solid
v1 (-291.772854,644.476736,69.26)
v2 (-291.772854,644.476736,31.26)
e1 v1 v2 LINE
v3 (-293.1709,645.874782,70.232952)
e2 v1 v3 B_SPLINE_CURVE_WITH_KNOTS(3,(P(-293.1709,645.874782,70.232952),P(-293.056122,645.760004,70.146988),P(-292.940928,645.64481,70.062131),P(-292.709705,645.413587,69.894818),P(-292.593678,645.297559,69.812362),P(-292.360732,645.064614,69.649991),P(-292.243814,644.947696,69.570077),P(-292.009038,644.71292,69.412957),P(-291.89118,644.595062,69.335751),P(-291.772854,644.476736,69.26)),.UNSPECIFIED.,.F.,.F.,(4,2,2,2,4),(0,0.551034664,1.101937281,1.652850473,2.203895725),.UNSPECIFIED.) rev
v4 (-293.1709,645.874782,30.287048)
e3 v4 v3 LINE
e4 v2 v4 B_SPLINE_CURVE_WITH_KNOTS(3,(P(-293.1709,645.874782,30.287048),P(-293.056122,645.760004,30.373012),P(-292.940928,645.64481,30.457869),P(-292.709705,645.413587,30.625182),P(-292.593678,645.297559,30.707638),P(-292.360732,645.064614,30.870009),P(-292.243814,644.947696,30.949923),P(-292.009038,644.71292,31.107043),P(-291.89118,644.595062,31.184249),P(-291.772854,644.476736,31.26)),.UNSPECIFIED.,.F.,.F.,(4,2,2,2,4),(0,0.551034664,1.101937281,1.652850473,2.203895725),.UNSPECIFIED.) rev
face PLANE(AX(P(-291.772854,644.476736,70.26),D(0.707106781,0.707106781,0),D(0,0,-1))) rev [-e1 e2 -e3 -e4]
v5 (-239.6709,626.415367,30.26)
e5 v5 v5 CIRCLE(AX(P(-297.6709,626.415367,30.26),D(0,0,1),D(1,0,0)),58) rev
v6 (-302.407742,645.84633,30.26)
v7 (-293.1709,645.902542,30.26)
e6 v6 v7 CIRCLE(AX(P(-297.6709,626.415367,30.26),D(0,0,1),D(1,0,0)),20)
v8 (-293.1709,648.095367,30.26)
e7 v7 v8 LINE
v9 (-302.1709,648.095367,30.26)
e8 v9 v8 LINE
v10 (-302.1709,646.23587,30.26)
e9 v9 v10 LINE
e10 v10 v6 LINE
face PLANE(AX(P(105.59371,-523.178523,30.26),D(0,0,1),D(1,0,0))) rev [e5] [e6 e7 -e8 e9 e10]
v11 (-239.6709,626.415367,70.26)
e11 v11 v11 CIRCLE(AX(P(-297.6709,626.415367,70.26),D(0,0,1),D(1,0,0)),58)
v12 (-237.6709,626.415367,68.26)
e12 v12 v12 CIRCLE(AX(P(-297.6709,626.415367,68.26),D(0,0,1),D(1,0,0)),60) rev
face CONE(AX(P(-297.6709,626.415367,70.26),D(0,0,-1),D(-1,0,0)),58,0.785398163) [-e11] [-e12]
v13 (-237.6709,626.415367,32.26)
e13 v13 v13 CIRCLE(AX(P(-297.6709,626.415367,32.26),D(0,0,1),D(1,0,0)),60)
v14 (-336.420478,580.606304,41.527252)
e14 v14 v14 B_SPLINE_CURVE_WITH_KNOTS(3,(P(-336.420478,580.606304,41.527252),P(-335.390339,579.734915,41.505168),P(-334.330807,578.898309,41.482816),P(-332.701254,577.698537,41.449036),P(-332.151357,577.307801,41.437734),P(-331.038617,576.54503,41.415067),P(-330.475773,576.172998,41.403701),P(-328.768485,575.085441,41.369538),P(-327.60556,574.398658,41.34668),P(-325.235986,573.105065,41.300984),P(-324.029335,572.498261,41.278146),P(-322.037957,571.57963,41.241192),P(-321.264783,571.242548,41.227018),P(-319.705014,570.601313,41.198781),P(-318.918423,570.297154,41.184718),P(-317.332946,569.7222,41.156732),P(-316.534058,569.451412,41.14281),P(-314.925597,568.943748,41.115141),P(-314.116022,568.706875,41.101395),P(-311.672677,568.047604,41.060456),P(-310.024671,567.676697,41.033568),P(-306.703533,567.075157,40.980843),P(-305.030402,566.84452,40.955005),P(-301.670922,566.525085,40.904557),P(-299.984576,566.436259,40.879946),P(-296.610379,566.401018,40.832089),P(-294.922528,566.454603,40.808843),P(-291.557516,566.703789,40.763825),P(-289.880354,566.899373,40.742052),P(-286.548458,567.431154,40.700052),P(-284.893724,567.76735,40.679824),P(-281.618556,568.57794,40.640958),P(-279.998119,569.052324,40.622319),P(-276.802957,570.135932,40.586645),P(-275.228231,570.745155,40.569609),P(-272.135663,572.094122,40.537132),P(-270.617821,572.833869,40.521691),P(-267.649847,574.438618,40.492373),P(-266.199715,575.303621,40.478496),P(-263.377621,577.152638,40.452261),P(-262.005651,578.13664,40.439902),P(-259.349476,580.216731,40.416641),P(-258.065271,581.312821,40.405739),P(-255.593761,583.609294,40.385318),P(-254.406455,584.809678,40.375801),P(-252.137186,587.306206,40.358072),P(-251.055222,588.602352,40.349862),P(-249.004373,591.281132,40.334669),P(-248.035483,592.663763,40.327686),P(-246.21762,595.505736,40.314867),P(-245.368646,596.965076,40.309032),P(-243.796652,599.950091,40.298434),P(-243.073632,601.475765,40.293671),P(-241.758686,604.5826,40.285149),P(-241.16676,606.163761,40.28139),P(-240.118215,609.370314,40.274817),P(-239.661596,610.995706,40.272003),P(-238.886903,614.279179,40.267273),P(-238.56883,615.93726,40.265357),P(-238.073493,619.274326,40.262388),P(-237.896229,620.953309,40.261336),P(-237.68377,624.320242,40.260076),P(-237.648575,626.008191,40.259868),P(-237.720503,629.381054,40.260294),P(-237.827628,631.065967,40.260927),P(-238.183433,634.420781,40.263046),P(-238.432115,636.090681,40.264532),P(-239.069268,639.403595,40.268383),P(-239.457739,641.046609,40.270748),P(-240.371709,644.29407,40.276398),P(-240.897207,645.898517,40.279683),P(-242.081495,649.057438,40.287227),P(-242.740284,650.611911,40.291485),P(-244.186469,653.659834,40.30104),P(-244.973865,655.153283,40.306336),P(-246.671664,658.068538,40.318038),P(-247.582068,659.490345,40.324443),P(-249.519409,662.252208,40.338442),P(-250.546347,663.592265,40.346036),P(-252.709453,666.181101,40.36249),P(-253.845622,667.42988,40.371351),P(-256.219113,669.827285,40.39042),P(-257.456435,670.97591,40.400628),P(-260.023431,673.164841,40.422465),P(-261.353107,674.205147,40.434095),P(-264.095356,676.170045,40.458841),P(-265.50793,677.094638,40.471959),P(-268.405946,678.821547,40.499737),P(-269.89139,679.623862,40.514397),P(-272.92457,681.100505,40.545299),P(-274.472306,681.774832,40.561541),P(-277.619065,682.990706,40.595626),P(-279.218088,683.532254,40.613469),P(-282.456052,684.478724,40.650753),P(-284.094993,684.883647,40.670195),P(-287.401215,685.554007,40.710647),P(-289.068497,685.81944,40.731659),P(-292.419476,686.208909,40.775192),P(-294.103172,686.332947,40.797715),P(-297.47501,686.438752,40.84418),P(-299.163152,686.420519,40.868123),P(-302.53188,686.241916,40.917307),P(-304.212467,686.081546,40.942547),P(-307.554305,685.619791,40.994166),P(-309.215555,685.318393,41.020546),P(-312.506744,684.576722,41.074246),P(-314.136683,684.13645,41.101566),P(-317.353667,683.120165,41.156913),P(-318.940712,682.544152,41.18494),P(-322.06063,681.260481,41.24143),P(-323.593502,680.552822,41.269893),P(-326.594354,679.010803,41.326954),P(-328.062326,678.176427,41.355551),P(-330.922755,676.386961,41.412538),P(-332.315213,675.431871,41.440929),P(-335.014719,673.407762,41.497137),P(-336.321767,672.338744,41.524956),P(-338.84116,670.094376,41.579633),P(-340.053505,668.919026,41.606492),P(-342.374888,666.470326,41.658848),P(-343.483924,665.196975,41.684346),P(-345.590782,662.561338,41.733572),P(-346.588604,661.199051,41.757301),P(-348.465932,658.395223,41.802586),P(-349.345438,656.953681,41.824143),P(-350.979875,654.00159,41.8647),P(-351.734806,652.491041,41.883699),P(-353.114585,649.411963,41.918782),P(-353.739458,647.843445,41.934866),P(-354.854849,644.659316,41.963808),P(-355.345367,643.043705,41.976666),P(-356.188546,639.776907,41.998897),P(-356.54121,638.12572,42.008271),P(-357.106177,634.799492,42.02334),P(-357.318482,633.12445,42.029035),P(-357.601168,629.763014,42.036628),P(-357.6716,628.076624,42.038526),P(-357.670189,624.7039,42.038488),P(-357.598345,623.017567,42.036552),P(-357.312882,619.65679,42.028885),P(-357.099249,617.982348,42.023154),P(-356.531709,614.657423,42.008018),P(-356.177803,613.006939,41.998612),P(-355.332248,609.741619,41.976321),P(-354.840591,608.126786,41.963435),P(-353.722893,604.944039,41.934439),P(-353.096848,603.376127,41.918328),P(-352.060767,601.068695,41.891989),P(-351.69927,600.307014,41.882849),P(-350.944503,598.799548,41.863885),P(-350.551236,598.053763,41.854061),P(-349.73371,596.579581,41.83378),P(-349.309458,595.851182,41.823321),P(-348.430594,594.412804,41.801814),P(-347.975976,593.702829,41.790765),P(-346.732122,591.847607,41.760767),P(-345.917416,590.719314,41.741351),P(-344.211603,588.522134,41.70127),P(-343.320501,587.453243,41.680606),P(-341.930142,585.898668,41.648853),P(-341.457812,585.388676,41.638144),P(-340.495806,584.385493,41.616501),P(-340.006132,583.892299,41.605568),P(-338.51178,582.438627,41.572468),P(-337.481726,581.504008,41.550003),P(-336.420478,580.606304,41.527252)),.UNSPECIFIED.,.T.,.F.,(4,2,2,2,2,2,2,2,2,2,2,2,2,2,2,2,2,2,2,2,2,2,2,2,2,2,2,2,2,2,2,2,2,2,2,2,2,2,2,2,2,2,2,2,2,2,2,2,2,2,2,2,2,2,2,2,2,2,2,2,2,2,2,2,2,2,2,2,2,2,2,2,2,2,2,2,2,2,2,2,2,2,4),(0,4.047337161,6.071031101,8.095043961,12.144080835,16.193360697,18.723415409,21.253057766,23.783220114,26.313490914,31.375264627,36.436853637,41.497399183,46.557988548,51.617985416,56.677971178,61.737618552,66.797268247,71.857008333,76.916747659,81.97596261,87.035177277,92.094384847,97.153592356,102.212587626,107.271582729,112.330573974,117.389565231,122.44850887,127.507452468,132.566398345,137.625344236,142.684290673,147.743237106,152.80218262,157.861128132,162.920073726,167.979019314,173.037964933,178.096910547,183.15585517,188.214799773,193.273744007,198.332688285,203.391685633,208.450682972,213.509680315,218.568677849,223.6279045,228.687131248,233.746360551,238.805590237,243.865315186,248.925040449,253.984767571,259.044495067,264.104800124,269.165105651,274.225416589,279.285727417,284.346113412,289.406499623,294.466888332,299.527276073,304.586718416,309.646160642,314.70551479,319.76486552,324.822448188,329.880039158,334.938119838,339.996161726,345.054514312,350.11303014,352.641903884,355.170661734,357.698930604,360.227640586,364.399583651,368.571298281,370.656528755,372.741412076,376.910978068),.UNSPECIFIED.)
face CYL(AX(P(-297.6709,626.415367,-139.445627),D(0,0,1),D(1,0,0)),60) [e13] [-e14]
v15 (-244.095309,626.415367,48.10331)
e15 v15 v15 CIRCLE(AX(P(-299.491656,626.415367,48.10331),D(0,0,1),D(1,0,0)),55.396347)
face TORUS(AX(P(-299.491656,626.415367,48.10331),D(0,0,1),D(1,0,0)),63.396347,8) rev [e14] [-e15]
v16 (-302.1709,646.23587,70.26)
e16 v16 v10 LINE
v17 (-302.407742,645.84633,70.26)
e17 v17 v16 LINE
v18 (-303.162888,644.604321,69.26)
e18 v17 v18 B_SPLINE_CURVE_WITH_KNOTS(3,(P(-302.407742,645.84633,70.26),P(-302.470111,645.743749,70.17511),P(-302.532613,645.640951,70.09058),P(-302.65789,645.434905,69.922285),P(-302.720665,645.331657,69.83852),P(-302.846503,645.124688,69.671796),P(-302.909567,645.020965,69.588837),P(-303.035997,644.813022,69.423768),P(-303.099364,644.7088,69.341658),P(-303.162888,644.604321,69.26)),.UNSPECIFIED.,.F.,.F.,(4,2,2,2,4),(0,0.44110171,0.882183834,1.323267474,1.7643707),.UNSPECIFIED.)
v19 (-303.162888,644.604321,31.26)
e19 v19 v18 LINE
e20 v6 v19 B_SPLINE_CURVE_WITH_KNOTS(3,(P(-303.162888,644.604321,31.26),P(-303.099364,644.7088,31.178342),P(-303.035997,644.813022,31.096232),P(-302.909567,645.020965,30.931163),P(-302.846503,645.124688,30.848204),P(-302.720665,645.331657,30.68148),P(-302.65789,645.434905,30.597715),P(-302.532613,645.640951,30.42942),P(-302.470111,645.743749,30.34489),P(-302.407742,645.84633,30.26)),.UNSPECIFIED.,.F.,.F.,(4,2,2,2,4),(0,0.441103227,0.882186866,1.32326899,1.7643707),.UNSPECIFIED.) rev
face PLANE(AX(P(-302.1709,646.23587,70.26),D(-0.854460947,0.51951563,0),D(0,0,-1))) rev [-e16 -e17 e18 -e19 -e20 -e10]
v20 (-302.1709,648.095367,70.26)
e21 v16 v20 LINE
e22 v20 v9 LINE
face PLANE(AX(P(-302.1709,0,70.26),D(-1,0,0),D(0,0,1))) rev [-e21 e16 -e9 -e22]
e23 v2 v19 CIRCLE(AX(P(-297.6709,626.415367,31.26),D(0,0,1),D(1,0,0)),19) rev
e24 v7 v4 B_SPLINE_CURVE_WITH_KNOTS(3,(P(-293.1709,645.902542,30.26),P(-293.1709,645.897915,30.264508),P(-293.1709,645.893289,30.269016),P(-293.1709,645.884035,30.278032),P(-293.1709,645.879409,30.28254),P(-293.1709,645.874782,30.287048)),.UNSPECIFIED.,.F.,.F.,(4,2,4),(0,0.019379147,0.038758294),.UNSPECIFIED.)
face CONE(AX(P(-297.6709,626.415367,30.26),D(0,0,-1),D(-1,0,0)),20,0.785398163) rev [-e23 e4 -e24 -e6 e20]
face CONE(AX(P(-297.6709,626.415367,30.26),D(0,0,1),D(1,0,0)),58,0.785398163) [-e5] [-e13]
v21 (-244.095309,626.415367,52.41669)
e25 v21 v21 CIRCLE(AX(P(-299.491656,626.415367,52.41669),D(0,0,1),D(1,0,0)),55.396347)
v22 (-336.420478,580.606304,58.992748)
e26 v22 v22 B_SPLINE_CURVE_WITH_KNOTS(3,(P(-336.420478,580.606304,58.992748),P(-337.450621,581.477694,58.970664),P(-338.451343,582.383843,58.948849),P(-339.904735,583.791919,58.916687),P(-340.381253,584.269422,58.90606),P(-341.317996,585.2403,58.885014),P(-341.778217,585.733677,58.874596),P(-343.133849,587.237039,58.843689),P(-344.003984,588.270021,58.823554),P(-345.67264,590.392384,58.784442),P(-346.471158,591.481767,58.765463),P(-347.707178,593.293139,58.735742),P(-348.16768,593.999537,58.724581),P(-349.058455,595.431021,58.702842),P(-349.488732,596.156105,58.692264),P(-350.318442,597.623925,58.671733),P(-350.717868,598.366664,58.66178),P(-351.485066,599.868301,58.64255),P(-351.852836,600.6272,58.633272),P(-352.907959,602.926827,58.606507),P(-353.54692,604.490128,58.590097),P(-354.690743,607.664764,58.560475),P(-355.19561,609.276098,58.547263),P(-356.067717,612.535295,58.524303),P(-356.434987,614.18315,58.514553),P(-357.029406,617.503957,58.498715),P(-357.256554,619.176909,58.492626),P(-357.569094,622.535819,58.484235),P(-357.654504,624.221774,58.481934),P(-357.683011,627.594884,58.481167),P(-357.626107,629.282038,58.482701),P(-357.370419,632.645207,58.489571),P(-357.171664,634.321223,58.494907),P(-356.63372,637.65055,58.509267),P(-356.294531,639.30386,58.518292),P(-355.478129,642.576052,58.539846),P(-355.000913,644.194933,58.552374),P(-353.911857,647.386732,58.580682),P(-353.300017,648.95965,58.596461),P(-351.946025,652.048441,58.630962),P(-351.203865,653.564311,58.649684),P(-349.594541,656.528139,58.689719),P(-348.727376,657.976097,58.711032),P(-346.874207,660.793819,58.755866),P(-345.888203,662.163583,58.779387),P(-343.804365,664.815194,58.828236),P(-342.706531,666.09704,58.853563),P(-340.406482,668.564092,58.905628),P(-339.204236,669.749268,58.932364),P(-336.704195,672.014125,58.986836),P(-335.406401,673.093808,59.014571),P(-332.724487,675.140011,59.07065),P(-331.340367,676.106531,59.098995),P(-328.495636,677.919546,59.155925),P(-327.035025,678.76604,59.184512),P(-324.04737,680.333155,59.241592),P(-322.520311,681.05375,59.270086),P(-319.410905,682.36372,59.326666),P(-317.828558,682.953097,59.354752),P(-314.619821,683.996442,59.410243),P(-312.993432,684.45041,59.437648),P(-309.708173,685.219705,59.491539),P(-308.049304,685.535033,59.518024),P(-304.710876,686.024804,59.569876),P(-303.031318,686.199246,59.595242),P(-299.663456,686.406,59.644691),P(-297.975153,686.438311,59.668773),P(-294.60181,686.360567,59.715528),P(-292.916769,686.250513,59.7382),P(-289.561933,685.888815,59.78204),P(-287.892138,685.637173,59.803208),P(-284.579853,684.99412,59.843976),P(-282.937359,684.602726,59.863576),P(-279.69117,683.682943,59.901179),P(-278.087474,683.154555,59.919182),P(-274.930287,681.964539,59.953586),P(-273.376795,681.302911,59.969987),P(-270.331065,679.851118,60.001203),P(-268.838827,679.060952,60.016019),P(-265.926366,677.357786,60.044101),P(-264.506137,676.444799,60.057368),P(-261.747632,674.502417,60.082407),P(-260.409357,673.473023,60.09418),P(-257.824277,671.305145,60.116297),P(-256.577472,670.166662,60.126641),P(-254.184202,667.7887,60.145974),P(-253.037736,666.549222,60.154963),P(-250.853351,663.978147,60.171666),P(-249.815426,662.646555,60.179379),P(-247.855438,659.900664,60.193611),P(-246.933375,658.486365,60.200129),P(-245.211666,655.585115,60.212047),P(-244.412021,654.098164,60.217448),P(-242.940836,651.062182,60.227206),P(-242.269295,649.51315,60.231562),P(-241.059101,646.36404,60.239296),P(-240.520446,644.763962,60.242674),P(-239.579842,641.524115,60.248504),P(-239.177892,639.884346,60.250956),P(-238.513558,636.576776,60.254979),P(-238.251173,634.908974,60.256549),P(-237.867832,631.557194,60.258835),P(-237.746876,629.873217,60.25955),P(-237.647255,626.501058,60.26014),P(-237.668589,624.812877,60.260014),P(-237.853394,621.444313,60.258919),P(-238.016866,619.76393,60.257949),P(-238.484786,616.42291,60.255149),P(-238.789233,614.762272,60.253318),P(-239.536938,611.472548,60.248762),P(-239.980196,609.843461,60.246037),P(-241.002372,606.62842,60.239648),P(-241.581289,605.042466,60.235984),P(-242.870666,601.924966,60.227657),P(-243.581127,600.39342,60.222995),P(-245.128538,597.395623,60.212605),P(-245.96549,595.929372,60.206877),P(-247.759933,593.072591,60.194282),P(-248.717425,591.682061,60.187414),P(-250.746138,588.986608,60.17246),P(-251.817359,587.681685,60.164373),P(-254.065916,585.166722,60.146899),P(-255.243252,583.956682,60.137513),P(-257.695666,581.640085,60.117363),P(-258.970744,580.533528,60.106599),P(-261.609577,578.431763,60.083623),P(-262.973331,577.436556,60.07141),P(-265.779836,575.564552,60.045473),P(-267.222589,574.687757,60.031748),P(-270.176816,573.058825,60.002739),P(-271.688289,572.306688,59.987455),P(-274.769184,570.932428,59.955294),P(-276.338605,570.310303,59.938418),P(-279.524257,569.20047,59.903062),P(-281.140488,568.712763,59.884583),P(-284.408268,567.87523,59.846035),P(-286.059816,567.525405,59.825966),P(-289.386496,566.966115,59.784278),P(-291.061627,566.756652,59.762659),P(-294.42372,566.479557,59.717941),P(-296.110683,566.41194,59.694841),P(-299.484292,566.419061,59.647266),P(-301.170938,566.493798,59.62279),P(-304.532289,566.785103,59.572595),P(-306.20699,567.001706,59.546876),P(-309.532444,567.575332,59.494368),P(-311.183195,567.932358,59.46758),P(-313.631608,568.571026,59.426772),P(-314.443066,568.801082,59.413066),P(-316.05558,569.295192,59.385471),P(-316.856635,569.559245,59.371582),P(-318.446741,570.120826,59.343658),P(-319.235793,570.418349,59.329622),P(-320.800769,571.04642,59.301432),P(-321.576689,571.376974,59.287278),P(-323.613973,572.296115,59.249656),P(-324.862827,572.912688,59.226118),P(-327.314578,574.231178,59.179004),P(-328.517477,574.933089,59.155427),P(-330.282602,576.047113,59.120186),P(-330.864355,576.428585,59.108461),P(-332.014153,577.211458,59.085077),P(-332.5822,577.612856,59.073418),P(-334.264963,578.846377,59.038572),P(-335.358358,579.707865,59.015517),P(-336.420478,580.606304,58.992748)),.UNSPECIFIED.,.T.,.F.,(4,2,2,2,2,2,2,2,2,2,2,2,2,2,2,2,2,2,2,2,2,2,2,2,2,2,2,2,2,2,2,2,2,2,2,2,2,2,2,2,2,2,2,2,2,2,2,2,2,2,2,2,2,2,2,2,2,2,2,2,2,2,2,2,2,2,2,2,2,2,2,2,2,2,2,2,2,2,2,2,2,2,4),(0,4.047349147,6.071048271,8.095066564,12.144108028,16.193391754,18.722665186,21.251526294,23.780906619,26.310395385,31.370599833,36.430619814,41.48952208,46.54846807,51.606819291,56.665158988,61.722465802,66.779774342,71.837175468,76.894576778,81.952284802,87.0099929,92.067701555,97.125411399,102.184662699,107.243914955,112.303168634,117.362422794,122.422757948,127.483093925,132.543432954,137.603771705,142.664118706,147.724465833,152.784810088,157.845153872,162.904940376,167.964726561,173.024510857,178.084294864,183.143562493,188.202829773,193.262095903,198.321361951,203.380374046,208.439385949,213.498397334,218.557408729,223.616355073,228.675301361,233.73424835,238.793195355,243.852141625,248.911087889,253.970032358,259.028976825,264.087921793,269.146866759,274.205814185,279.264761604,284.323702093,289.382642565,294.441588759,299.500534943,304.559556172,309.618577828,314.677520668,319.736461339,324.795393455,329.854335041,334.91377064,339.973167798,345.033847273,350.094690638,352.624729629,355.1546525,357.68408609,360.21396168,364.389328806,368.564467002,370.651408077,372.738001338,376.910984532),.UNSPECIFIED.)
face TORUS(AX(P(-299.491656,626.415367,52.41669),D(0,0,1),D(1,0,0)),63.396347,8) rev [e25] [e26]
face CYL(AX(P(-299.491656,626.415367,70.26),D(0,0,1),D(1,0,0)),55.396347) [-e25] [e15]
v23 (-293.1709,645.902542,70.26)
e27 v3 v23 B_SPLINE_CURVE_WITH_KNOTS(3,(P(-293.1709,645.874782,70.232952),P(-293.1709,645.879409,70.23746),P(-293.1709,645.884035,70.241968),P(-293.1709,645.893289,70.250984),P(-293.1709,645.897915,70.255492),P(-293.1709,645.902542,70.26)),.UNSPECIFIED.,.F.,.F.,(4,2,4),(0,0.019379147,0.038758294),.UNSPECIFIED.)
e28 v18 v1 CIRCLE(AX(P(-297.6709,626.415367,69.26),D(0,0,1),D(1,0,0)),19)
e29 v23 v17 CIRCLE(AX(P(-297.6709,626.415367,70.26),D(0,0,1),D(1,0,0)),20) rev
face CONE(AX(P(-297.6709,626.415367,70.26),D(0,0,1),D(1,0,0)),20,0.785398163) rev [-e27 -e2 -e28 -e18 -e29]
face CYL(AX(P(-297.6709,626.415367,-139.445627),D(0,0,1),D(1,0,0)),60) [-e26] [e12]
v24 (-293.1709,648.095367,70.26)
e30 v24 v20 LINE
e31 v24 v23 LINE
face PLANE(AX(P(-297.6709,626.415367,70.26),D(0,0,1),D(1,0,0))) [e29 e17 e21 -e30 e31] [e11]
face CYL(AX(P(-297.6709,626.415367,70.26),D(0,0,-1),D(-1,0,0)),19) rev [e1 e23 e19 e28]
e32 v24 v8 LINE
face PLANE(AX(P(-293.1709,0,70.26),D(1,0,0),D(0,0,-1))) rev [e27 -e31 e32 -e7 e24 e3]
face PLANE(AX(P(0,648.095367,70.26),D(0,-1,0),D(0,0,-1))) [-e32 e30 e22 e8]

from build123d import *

# Parameters (mm, degrees)
SKETCH_1_R               = 60
SKETCH_1_R_2             = 14.438127561
EXTRUDE_1_DEPTH          = 40
CHAMFER_1_SIZE           = 2
SKETCH_5_R               = 25.161734689
EXTRUDE_2_DEPTH          = 40
CUT_EXTRUDE_1_DEPTH      = 776.044855896
CUT_EXTRUDE_1_DEPTH_BACK = 776.044855896
CHAMFER_2_SIZE           = 1.361088561
CHAMFER_2_SIZE_2         = 1


with BuildPart() as part:
    # 草图1 → 凸台-拉伸1 (new body)
    with BuildSketch(Plane.XY.offset(70.26)):
        with Locations((-297.670899951, 626.415366791)):
            Circle(SKETCH_1_R)
        with Locations((-297.670899951, 626.415366791)):
            Circle(SKETCH_1_R_2, mode=Mode.SUBTRACT)
    extrude(amount=-EXTRUDE_1_DEPTH)

    # 草图4 → 切除-旋转1 (revolve, cut)
    with BuildSketch(Plane(origin=(0, 626.415366791, 0), x_dir=(1, 0, 0), z_dir=(0, 1, 0))):
        with BuildLine():
            Line((-244.095308656, -48.103310059), (-244.095308655, -52.416689982))
            ThreePointArc((-244.095308655, -52.416689982), (-242.284199059, -57.48597347), (-237.670899813, -60.259999987))
            Line((-237.670899813, -60.259999987), (-237.670899811, -40.260000013))
            ThreePointArc((-237.670899811, -40.260000013), (-242.284199071, -43.034026546), (-244.095308656, -48.103310059))
        make_face()
    revolve(axis=Axis((-299.491656028, 626.415366791, 70.26), (0, 0, -1)), mode=Mode.SUBTRACT)

    # 倒角1
    chamfer_1_edges = [part.edges().sort_by_distance(p)[0] for p in [
        (-357.670899951, 626.415366791, 70.26),
        (-357.670899951, 626.415366791, 30.26),
    ]]
    chamfer(chamfer_1_edges, length=CHAMFER_1_SIZE)

    # 草图5 → 凸台-拉伸2 (add)
    with BuildSketch(Plane.XY.offset(70.26)):
        with Locations((-297.670899951, 626.415366791)):
            Circle(SKETCH_5_R)
    extrude(amount=-EXTRUDE_2_DEPTH)

    # 草图6 → 切除-拉伸1 (cut, two sides: drawn at the far end of the back side and taken through both)
    with BuildSketch(Plane(origin=(0, 0, 30.26), x_dir=(-1, 0, 0), z_dir=(0, 0, -1)).offset(-CUT_EXTRUDE_1_DEPTH_BACK)):
        with BuildLine():
            ThreePointArc((302.170899951, 644.874781733), (297.670899951, 645.415366791), (293.170899951, 644.874781733))
            Line((293.170899951, 644.874781733), (293.170899951, 626.415366791))
            Line((293.170899951, 626.415366791), (302.170899951, 626.415366791))
            Line((302.170899951, 626.415366791), (302.170899951, 644.874781733))
        make_face()
        with BuildLine():
            Line((293.170899951, 626.415366791), (293.170899951, 644.874781733))
            ThreePointArc((293.170899951, 644.874781733), (285.934205356, 611.473813993), (316.670899951, 626.415366791))
            ThreePointArc((316.670899951, 626.415366791), (312.612452748, 638.152061385), (302.170899951, 644.874781733))
            Line((302.170899951, 644.874781733), (302.170899951, 626.415366791))
            Line((302.170899951, 626.415366791), (293.170899951, 626.415366791))
        make_face()
        with BuildLine():
            Line((302.170899951, 648.095366791), (293.170899951, 648.095366791))
            Line((293.170899951, 648.095366791), (293.170899951, 644.874781733))
            ThreePointArc((293.170899951, 644.874781733), (297.670899951, 645.415366791), (302.170899951, 644.874781733))
            Line((302.170899951, 644.874781733), (302.170899951, 648.095366791))
        make_face()
    extrude(amount=CUT_EXTRUDE_1_DEPTH + CUT_EXTRUDE_1_DEPTH_BACK, mode=Mode.SUBTRACT)

    # 倒角2
    # the kernel refuses this chamfer: 1.361088561, 1 mm, written as the material it takes off along each edge
    with BuildSketch(Plane(origin=(-302.170899951, 644.874781733, 26.740268541), x_dir=(0, 1, 0), z_dir=(0, 0, 1))) as chamfer_2_piece_1:
        with BuildLine():
            Line((CHAMFER_2_SIZE, 0), (-0.270460462, 0.991988248))
            ThreePointArc((-0.270460462, 0.991988248), (-0.133734106, 0.516913582), (0, 0))
            Line((0, 0), (CHAMFER_2_SIZE, 0))
        make_face()
    extrude(amount=47.039462917, mode=Mode.SUBTRACT)
    with BuildSketch(Plane(origin=(-293.170899951, 644.874781733, 26.506479775), x_dir=(0, 1, 0), z_dir=(0, 0, 1))) as chamfer_2_piece_2:
        with BuildLine():
            Line((CHAMFER_2_SIZE_2, 0), (-0.398045781, -1.398045781))
            ThreePointArc((-0.398045781, -1.398045781), (-0.192184694, -0.725734308), (0, 0))
            Line((0, 0), (CHAMFER_2_SIZE_2, 0))
        make_face()
    extrude(amount=47.507040451, mode=Mode.SUBTRACT)
    # the kernel refuses this chamfer: 1.361088561, 1 mm, written as the material it takes off along each edge
    with BuildSketch(Plane(origin=(-297.670899951, 626.415366791, 30.26), x_dir=(0.17889175862136222, 0.9838687609114116, 0), z_dir=(-0.9838687609114116, 0.17889175862136222, 0))) as chamfer_2_2_piece_1:
        Polygon((19, -CHAMFER_2_SIZE_2), (19 + CHAMFER_2_SIZE_2, 0), (19, 0), align=None)
    revolve(axis=Axis((-297.670899951, 626.415366791, 30.26), (0, 0, -1)), revolution_arc=259.694785461, mode=Mode.SUBTRACT)
    with BuildSketch(Plane(origin=(-297.670899951, 626.415366791, 70.26), x_dir=(0.17889175862137457, 0.9838687609114093, 0), z_dir=(-0.9838687609114093, 0.17889175862137457, 0))) as chamfer_2_2_piece_2:
        Polygon((19 + CHAMFER_2_SIZE_2, 0), (19, CHAMFER_2_SIZE_2), (19, 0), align=None)
    revolve(axis=Axis((-297.670899951, 626.415366791, 70.26), (0, 0, -1)), revolution_arc=259.694785461, mode=Mode.SUBTRACT)
    with BuildSketch(Plane(origin=(-297.670899951, 626.415366791, 70.26), x_dir=(-1, 0, 0), z_dir=(0, -1, 0))) as chamfer_2_2_piece_3:
        Polygon((19 + CHAMFER_2_SIZE_2, 0), (19, CHAMFER_2_SIZE_2), (19, 0), align=None)
    revolve(axis=Axis((-297.670899951, 626.415366791, 70.26), (0, 0, -1)), revolution_arc=80.955933819, mode=Mode.SUBTRACT)
    with BuildSketch(Plane(origin=(-297.670899951, 626.415366791, 30.26), x_dir=(-1, 0, 0), z_dir=(0, -1, 0))) as chamfer_2_2_piece_4:
        Polygon((19, -CHAMFER_2_SIZE_2), (19 + CHAMFER_2_SIZE_2, 0), (19, 0), align=None)
    revolve(axis=Axis((-297.670899951, 626.415366791, 30.26), (0, 0, -1)), revolution_arc=80.955933819, mode=Mode.SUBTRACT)


solid = part.part
